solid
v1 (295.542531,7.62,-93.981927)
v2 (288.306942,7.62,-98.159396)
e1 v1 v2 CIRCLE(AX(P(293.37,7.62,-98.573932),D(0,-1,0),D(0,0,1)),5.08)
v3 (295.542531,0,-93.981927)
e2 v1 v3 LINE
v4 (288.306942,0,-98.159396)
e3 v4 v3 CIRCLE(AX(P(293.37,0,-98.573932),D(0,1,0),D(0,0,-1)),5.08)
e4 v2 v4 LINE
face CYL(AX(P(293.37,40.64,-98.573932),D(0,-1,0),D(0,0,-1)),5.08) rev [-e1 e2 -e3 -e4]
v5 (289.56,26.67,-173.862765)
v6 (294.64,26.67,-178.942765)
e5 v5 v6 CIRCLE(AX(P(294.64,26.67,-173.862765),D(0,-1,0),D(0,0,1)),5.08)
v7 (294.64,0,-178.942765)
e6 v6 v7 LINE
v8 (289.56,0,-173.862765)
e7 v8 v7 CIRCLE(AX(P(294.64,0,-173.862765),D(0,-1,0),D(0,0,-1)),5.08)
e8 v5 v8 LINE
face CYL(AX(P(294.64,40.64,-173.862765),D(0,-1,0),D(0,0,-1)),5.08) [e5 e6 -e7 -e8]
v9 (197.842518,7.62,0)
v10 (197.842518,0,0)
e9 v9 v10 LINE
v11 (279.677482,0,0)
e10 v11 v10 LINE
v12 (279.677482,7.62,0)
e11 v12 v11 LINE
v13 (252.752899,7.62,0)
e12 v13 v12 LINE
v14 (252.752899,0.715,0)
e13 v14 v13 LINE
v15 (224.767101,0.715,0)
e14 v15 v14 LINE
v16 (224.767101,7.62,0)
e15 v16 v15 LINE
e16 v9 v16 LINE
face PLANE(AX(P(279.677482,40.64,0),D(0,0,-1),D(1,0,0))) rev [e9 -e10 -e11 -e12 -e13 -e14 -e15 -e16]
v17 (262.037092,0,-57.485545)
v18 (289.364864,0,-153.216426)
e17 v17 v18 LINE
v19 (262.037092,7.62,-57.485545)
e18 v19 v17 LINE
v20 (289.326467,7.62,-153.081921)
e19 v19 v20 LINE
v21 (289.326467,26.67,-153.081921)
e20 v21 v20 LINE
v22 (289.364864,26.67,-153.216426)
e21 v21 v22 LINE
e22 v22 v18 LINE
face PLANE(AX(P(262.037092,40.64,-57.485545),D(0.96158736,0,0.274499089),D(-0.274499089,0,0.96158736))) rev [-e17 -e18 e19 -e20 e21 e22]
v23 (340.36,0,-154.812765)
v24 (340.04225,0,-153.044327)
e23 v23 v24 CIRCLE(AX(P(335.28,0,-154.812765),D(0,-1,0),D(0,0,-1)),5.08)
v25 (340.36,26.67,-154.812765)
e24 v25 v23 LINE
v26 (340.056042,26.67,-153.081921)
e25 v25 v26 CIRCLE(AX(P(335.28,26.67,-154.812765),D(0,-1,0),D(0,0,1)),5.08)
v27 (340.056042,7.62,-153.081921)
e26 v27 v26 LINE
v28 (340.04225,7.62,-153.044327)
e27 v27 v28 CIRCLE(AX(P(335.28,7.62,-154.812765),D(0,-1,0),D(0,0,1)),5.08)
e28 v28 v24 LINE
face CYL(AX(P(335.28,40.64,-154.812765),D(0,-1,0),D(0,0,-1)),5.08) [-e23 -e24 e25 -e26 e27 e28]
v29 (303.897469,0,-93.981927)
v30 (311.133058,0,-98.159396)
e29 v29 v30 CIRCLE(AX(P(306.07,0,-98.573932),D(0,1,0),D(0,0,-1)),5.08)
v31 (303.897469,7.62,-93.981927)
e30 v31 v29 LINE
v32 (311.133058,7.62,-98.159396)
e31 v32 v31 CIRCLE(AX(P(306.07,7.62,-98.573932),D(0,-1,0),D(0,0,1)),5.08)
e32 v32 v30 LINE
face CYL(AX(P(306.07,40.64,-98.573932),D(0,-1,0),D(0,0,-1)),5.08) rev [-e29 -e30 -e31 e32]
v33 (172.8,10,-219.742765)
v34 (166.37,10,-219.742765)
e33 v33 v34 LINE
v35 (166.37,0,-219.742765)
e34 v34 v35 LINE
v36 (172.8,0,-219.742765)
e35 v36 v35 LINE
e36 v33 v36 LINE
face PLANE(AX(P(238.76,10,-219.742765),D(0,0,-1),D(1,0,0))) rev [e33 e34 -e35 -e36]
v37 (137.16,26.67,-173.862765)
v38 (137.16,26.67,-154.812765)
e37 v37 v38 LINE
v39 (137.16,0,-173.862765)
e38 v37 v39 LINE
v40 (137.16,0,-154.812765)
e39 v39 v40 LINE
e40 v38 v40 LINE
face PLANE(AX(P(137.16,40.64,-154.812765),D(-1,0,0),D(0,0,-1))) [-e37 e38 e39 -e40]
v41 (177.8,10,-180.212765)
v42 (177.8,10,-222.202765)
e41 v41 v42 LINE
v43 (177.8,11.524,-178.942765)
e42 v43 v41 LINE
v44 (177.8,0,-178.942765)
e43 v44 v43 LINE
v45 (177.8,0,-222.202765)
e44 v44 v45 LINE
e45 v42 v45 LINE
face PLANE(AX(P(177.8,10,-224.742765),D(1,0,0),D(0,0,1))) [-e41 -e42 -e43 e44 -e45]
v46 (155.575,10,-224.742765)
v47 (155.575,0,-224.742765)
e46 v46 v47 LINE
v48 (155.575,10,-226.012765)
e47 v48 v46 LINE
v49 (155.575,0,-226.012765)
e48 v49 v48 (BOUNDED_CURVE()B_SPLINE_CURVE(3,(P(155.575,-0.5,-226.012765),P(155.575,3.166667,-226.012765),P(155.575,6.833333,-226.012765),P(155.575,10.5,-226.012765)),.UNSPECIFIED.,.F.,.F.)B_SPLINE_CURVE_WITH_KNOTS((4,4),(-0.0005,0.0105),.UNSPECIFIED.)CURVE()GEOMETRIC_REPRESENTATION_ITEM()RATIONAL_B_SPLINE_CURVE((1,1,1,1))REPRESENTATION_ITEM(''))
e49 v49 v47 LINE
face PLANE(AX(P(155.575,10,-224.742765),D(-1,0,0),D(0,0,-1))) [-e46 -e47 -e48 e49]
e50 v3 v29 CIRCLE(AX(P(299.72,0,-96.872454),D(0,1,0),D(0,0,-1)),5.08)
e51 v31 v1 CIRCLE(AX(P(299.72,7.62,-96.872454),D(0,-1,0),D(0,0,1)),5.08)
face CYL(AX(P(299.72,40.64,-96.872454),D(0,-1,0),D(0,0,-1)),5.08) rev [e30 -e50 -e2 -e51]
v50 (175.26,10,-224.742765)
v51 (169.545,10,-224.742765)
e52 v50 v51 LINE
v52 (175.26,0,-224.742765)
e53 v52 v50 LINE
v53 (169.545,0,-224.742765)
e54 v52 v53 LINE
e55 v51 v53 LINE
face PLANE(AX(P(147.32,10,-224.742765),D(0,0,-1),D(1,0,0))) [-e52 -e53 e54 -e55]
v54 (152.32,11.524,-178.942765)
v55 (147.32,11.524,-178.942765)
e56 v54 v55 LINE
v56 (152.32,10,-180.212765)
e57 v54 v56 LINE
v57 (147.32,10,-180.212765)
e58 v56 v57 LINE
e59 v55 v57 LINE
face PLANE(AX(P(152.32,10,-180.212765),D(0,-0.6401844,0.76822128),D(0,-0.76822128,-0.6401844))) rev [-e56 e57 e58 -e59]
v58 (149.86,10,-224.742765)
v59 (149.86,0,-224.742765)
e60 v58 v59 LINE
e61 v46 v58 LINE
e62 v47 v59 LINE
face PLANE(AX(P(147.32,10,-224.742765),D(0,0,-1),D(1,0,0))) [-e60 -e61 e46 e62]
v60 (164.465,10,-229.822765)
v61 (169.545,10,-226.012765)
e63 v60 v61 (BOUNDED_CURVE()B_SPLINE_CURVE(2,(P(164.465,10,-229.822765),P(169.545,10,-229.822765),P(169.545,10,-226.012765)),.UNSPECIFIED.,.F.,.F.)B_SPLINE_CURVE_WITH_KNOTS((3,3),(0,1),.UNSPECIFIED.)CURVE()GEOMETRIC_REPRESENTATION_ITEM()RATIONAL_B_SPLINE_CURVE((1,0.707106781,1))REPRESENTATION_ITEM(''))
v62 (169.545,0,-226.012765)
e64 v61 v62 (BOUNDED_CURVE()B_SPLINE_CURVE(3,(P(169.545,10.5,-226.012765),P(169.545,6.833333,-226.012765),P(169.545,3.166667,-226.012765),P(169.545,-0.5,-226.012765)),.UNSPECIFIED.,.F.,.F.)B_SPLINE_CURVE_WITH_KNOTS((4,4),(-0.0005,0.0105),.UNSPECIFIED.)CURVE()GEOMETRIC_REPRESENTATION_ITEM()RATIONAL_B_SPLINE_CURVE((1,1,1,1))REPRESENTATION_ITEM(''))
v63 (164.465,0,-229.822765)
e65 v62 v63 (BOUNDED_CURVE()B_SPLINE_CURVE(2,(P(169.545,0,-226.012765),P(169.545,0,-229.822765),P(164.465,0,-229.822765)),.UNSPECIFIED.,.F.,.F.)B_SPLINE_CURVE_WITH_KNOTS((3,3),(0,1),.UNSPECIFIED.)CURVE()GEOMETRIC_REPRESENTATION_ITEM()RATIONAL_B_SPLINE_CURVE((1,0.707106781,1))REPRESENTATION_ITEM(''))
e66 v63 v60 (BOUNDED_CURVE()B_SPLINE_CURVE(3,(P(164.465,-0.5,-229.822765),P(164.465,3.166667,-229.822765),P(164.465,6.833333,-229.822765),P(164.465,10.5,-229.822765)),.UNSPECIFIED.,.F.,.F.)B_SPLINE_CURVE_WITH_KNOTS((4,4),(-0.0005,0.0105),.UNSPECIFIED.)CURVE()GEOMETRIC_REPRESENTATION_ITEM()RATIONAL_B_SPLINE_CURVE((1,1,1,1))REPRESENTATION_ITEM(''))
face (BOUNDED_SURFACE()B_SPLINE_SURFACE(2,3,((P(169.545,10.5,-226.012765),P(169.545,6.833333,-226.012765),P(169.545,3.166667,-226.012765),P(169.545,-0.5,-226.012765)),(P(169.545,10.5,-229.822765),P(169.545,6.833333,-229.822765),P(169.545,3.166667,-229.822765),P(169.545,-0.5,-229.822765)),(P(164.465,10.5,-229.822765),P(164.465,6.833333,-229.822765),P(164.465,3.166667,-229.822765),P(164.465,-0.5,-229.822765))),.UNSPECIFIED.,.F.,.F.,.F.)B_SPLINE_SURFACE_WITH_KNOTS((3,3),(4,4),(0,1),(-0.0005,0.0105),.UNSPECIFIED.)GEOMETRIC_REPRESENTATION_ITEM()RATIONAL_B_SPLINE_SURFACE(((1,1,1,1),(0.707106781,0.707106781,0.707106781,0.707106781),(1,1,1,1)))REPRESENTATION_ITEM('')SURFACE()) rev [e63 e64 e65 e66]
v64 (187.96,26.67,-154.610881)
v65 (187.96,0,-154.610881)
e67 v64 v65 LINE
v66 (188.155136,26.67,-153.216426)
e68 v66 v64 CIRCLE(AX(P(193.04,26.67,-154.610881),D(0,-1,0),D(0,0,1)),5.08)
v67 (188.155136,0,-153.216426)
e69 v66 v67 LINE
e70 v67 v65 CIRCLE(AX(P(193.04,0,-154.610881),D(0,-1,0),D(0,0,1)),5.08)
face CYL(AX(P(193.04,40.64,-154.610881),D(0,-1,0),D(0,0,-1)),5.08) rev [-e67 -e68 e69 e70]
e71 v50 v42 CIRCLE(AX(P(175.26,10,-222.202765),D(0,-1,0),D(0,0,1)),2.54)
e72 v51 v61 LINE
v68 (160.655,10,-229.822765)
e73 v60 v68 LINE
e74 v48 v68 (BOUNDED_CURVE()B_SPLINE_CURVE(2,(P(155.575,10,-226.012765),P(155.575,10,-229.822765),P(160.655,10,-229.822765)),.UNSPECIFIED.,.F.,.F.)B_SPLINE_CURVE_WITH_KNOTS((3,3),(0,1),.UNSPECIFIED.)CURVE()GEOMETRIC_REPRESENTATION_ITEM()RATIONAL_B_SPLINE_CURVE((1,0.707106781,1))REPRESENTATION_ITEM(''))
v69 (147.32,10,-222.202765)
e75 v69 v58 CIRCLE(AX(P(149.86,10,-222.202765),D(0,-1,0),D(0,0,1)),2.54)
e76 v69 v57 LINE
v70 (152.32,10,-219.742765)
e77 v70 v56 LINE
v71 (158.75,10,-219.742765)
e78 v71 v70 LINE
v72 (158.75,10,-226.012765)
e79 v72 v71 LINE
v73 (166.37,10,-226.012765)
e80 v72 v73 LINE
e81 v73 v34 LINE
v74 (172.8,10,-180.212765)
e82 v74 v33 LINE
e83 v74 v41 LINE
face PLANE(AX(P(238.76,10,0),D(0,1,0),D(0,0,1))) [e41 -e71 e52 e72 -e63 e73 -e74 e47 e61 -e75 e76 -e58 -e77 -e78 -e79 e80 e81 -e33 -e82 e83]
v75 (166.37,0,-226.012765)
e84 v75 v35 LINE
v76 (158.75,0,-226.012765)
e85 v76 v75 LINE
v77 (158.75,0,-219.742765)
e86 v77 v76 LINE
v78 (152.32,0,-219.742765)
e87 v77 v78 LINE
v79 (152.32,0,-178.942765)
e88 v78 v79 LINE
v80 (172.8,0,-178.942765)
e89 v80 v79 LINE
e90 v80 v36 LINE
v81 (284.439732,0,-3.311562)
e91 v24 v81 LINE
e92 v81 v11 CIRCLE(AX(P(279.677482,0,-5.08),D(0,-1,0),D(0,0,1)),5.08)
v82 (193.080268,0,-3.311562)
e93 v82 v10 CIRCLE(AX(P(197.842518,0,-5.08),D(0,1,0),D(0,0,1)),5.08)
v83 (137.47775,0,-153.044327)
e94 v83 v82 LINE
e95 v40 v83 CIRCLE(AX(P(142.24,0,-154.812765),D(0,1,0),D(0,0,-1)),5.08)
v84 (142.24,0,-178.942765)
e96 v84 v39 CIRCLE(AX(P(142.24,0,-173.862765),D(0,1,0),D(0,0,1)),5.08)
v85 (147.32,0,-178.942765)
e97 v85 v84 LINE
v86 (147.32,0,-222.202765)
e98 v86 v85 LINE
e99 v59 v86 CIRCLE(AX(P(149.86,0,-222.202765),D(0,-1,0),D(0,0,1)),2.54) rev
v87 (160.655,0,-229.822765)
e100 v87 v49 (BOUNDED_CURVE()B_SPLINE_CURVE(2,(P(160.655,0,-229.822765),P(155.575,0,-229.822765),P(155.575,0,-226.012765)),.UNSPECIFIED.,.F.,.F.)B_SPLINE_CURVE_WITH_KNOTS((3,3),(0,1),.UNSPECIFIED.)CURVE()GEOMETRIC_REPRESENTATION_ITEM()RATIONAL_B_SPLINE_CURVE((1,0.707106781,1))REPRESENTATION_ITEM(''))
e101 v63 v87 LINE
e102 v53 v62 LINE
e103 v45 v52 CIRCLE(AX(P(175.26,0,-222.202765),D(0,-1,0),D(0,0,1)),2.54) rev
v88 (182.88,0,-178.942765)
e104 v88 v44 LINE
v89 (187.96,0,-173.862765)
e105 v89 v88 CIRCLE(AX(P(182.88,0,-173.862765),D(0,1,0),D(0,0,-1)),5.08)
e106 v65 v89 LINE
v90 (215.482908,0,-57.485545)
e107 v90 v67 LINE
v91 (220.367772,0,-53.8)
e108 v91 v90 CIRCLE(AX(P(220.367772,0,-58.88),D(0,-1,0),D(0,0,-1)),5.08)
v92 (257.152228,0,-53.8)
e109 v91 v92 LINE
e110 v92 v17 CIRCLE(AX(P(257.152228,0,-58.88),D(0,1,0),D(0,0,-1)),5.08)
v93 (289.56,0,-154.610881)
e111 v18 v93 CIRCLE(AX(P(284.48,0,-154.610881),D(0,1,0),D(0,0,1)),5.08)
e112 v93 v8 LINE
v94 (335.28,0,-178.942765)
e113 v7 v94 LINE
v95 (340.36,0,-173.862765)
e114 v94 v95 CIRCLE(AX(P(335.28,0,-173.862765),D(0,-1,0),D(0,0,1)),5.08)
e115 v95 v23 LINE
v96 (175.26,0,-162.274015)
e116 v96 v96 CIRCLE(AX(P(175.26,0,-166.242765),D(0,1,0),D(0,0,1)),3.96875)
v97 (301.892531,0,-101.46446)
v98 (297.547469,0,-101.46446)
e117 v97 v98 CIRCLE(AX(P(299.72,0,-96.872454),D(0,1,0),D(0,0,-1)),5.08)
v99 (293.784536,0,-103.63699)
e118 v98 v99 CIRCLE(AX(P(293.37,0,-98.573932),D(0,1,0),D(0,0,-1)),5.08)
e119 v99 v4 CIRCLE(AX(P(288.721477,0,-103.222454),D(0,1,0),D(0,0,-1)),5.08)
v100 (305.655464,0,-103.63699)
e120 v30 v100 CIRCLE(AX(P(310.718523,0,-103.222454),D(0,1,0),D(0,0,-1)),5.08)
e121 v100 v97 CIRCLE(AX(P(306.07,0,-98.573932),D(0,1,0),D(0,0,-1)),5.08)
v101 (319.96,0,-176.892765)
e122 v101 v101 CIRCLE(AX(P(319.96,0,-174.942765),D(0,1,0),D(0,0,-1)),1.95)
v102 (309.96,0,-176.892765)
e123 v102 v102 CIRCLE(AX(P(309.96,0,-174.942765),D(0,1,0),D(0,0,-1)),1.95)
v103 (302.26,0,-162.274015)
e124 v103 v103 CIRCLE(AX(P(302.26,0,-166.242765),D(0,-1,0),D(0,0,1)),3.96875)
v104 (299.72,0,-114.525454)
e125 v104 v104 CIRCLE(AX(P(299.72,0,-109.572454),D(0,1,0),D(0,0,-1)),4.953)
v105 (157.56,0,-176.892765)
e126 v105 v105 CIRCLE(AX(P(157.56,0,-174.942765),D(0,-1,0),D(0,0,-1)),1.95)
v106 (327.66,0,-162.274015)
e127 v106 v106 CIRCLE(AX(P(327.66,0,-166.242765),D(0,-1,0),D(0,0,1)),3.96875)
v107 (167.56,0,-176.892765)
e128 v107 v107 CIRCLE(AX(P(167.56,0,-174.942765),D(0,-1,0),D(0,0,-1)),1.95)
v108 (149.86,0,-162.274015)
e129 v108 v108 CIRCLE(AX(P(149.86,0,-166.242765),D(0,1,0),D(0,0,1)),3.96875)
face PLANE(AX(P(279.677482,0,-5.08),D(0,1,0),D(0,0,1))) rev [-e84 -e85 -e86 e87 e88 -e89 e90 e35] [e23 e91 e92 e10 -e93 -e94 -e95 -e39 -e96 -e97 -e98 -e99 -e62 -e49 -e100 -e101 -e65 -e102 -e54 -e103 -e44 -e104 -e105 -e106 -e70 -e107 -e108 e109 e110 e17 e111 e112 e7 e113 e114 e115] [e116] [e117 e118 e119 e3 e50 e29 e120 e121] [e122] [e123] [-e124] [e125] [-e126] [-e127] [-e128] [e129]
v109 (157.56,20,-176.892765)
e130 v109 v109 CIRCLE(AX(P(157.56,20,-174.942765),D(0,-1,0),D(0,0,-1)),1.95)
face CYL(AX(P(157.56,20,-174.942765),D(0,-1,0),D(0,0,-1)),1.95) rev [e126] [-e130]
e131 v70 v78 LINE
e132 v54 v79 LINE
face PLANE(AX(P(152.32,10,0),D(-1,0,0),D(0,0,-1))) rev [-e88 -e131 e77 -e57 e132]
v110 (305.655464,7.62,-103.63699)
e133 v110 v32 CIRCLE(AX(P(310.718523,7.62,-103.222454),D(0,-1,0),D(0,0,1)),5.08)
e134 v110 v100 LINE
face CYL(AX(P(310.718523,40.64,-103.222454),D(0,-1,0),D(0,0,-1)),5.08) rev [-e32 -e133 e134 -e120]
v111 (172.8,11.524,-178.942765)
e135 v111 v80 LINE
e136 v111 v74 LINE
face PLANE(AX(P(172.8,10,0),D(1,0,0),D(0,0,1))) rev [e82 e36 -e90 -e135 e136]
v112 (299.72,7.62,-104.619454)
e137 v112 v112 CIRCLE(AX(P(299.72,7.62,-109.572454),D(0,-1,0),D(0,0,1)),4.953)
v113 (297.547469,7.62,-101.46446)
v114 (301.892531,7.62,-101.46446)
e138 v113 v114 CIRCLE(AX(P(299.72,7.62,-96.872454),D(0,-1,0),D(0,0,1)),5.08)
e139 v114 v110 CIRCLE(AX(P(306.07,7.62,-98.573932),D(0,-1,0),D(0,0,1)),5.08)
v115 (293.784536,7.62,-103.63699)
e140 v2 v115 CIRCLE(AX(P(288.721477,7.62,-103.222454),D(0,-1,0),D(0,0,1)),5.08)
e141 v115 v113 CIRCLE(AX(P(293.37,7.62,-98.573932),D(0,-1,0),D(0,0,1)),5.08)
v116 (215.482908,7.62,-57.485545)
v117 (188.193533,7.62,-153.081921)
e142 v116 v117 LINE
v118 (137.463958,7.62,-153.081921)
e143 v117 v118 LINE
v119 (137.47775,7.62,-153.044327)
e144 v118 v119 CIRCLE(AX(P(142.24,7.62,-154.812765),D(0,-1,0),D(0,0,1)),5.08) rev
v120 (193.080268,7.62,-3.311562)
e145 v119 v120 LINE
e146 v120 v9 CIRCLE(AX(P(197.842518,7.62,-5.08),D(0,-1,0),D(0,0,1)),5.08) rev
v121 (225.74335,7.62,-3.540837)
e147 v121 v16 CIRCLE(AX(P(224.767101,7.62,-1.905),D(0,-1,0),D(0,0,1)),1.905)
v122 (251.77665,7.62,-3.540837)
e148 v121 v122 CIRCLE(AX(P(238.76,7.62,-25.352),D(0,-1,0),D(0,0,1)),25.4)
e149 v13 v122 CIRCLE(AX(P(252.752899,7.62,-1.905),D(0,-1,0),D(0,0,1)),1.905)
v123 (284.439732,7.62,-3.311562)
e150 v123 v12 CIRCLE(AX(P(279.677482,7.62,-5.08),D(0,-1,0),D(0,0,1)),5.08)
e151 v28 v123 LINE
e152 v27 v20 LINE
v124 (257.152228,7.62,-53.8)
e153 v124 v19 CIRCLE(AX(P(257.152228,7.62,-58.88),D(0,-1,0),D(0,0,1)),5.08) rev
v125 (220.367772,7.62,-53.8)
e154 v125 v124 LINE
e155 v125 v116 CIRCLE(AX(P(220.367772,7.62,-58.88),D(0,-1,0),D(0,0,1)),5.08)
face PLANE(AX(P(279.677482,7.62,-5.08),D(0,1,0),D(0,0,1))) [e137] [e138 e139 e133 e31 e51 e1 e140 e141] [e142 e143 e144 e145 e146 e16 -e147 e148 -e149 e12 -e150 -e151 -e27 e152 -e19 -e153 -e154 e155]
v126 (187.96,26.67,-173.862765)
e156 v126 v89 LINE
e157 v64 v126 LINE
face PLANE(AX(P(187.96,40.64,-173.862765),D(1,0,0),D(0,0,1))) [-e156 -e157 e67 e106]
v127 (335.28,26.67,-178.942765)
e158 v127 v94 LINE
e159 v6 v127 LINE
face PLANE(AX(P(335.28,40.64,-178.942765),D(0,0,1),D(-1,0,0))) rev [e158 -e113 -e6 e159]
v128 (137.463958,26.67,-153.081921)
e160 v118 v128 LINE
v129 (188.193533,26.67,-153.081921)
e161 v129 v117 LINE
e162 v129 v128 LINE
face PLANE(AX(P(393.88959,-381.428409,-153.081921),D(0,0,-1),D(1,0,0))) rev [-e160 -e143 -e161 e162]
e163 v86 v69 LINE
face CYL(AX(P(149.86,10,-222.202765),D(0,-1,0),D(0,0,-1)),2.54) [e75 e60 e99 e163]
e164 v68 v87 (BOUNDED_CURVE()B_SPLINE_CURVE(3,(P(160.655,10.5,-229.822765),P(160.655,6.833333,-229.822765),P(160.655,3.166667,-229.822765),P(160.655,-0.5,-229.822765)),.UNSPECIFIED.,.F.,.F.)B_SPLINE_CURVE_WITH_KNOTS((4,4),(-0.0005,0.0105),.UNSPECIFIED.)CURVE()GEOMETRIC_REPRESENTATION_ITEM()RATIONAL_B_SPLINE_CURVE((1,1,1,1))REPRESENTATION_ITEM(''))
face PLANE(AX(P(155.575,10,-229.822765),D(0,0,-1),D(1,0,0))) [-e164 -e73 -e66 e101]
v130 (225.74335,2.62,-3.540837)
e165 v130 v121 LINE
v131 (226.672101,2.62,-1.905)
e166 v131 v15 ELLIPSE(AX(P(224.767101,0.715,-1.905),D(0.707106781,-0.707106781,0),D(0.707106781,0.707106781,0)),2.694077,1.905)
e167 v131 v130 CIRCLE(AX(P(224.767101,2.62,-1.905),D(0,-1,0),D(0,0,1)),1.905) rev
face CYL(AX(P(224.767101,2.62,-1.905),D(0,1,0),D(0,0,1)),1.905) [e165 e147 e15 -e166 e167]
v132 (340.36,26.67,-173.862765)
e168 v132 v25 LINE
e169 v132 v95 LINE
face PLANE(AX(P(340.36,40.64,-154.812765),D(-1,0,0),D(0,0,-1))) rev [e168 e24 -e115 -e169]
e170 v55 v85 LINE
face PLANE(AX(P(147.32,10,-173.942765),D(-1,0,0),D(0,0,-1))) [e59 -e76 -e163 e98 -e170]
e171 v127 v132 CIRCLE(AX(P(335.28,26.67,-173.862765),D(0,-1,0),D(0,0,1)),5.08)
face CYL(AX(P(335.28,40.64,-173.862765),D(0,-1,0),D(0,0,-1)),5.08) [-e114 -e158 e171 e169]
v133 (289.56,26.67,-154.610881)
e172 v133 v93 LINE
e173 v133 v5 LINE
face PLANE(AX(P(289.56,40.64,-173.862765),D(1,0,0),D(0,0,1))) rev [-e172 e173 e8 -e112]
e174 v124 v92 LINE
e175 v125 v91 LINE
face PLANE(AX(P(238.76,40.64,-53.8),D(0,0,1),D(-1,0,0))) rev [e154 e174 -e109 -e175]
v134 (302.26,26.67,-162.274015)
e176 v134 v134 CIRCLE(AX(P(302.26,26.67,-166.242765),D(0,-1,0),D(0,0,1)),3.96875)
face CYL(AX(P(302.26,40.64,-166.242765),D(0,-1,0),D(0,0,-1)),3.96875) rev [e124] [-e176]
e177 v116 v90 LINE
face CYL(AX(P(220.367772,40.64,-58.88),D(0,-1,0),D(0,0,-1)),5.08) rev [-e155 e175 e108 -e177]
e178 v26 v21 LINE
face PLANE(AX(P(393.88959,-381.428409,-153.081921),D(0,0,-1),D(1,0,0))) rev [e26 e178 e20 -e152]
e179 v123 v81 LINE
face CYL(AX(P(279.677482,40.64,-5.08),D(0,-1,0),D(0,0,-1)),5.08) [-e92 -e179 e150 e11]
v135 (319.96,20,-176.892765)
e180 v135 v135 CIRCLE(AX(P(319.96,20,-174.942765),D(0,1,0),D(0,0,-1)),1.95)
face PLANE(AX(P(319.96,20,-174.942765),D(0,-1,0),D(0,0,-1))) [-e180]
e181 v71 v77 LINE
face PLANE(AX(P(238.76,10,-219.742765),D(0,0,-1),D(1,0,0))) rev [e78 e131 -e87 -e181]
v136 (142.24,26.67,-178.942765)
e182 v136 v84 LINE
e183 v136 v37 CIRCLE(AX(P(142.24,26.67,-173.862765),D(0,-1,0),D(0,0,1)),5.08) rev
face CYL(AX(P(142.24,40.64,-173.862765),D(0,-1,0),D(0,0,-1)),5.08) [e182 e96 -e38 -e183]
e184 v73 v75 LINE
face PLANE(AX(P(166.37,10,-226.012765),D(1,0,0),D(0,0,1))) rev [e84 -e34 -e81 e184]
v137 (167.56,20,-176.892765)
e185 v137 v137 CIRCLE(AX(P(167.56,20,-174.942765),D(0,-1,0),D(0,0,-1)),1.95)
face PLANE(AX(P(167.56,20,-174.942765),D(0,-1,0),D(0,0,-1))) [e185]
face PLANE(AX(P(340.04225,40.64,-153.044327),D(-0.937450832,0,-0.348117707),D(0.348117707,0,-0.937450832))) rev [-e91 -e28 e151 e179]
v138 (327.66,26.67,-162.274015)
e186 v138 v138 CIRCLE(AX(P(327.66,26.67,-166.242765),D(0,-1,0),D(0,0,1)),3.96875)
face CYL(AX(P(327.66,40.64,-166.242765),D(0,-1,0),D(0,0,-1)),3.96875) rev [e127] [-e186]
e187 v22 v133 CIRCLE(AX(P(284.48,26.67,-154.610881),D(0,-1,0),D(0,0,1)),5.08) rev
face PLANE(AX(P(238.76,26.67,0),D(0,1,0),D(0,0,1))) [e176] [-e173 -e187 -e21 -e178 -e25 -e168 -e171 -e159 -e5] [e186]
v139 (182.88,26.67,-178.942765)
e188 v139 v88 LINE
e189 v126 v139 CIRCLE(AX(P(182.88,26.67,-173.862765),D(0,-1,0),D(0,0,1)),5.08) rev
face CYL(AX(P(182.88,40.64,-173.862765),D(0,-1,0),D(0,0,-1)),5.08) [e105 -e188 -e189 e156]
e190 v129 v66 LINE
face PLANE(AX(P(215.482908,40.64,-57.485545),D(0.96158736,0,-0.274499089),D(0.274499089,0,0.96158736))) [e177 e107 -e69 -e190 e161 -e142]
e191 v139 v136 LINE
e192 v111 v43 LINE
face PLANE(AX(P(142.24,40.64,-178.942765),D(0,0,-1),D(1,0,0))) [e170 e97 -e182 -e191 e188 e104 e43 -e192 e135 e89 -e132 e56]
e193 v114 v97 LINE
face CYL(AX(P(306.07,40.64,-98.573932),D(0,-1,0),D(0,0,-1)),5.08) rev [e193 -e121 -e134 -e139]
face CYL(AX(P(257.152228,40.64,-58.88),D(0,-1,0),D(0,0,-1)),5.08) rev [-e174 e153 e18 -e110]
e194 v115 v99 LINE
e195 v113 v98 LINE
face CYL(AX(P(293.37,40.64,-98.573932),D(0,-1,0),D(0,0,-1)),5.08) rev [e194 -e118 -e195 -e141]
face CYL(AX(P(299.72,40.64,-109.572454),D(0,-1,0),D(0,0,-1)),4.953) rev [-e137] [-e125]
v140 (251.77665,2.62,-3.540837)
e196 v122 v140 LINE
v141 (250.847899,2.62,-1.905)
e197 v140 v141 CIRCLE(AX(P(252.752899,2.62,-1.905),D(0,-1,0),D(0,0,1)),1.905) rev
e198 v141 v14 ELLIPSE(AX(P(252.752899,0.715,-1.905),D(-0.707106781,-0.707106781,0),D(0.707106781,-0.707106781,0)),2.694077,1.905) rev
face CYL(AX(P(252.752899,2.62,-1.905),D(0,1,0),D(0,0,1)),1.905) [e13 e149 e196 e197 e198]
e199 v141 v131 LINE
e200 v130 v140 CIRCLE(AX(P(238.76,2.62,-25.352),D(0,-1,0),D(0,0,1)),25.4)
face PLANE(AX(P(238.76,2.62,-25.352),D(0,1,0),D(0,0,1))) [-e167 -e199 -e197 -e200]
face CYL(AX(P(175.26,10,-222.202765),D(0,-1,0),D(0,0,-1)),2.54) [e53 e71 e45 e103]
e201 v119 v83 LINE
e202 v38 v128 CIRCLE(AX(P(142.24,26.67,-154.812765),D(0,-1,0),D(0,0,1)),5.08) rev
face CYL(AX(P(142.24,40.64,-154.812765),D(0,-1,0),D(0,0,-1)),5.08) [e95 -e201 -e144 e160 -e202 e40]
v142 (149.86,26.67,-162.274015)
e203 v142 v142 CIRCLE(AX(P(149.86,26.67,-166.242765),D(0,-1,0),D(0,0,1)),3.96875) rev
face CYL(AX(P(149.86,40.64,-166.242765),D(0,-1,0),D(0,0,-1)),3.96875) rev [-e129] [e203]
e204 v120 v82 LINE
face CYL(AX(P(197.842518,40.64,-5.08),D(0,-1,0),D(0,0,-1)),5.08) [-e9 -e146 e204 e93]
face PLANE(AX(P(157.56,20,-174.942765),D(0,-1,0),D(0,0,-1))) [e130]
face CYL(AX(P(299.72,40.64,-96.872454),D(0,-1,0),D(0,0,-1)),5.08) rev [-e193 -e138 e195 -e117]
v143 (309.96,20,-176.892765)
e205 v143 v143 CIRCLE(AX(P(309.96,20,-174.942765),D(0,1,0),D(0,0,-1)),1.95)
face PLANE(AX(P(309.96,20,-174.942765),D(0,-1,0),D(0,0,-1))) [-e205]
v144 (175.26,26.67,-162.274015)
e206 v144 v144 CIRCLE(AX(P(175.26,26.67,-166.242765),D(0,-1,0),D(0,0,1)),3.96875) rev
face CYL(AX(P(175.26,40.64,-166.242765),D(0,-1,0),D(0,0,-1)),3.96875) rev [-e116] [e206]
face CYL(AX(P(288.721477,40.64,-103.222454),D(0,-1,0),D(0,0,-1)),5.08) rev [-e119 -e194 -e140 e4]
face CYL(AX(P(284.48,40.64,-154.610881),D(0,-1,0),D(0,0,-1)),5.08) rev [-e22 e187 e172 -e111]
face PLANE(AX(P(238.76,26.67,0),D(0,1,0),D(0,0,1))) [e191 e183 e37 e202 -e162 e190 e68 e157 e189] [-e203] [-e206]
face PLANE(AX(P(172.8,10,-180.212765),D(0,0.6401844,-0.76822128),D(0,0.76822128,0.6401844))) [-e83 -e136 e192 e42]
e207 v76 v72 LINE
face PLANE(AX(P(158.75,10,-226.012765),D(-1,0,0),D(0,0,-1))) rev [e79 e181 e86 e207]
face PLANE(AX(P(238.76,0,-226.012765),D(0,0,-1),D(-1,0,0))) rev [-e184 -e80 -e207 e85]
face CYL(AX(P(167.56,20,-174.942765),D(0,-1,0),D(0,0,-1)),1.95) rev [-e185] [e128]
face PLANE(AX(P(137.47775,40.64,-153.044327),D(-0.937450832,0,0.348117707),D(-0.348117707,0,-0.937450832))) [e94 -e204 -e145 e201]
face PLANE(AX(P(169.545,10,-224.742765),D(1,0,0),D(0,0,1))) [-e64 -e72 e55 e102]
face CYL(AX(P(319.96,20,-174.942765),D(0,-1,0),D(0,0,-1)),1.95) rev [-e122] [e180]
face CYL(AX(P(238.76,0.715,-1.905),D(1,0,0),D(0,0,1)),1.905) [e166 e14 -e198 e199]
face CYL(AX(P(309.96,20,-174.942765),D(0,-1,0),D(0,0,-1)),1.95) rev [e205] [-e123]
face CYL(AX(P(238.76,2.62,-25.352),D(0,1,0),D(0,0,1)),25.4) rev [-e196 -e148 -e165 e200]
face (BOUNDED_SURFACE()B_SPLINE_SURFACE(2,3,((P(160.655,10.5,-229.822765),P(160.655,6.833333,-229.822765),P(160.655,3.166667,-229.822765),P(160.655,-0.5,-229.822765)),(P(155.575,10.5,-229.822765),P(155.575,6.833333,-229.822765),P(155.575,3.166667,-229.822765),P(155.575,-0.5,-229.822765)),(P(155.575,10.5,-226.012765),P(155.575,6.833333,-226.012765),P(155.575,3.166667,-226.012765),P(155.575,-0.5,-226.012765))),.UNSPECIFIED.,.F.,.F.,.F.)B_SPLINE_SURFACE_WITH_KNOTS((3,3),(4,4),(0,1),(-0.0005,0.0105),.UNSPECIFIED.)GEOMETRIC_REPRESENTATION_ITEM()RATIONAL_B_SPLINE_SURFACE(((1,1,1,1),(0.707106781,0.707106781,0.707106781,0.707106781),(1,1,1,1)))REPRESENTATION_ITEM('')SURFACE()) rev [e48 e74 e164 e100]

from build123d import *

# Parameters (mm, degrees)
SKETCH1_R            = 3.96875
BOSS_EXTRUDE2_DEPTH  = 40.64
SKETCH7_W            = 321.437634852
SKETCH7_H            = 153.081921076
CUT_EXTRUDE3_DEPTH   = 33.02
EXTRUDE_THIN1_DEPTH  = 10
SKETCH14_R           = 1.950000064
CUT_EXTRUDE6_DEPTH   = 20
BOSS_EXTRUDE4_DEPTH  = 5
MIRROR5_COPY_1_DEPTH = 5
FILLET3_R            = 2.54
SKETCH20_W           = 13.97
SKETCH20_H           = 5.08
BOSS_EXTRUDE5_DEPTH  = 10
FILLET7_SIZE         = 3.81
FILLET7_SIZE_2       = 5.08
FILLET6_SIZE         = 3.81
FILLET6_SIZE_2       = 5.08
CUT_EXTRUDE10_START  = -5
SKETCH19_W           = 7.62
SKETCH19_H           = 10.16
CUT_EXTRUDE10_DEPTH  = 6.27
MIRROR6_OUTLINE_W    = 7.62
MIRROR6_OUTLINE_H    = 5
MIRROR6_DEPTH        = 10
MIRROR6_2_DEPTH      = 10
SKETCH21_W           = 77.087164644
SKETCH21_H           = 69.073945867
CUT_EXTRUDE11_DEPTH  = 210.74909516
SKETCH23_R           = 5.08
CUT_EXTRUDE12_DEPTH  = 255.54404949
SKETCH22_R           = 4.953
CUT_EXTRUDE13_DEPTH  = 255.54404949
CUT_EXTRUDE14_START  = 19.05
SKETCH24_W           = 240.575030827
SKETCH24_H           = 80.300707095
CUT_EXTRUDE14_DEPTH  = 235.389112867
SKETCH25_R           = 25.4
CUT_EXTRUDE15_DEPTH  = 5
FILLET10_R           = 1.905


# Read off the part's stored shape, not the designer's step: Mirror6
with BuildPart() as part:
    # Sketch1 → Boss-Extrude2 (new body)
    with BuildSketch(Plane(origin=(0, 0, 0), x_dir=(1, 0, 0), z_dir=(0, 1, 0))):
        with BuildLine():
            Line((-96.52, 178.942765331), (-55.88, 178.942765331))
            ThreePointArc((-55.88, 178.942765331), (-52.287897552, 177.454867779), (-50.8, 173.862765331))
            Line((-50.8, 173.862765331), (-50.8, 154.610881096))
            ThreePointArc((-50.8, 154.610881096), (-50.750979429, 153.906859803), (-50.604863787, 153.216425724))
            Line((-50.604863787, 153.216425724), (-23.277092285, 57.485544628))
            ThreePointArc((-23.277092285, 57.485544628), (-21.451849938, 54.824742099), (-18.392228498, 53.8))
            Line((-18.392228498, 53.8), (0, 53.8))
            Line((0, 53.8), (0, 0))
            Line((0, 0), (-40.91748188, 0))
            ThreePointArc((-40.91748188, 0), (-43.817717665, 0.909264766), (-45.679732106, 3.31156205))
            Line((-45.679732106, 3.31156205), (-101.282250226, 153.044327381))
            ThreePointArc((-101.282250226, 153.044327381), (-101.519931557, 153.914386555), (-101.6, 154.812765331))
            Line((-101.6, 154.812765331), (-101.6, 173.862765331))
            ThreePointArc((-101.6, 173.862765331), (-100.112102448, 177.454867779), (-96.52, 178.942765331))
        make_face()
        with Locations(Location((-88.9, 166.242765331, 0), (0, 0, 270))):
            Circle(SKETCH1_R, mode=Mode.SUBTRACT)
        with Locations(Location((-63.5, 166.242765331, 0), (0, 0, 270))):
            Circle(SKETCH1_R, mode=Mode.SUBTRACT)
    boss_extrude2 = extrude(amount=BOSS_EXTRUDE2_DEPTH)

    # Mirror1: Boss-Extrude2 across plane
    add(boss_extrude2.mirror(Plane(origin=(0, 40.64, -53.8), x_dir=(0, 0, 1), z_dir=(-1, 0, 0))))

    # Sketch7 → Cut-Extrude3 (cut)
    with BuildSketch(Plane(origin=(0, 40.64, 0), x_dir=(1, 0, 0), z_dir=(0, 1, 0))):
        with Locations((5.589227859, 76.540960538)):
            Rectangle(SKETCH7_W, SKETCH7_H)
    extrude(amount=-CUT_EXTRUDE3_DEPTH, mode=Mode.SUBTRACT)

    # Sketch9 → Extrude-Thin1 (add)
    with BuildSketch(Plane(origin=(0, 0, 0), x_dir=(1, 0, 0), z_dir=(0, 1, 0))):
        Polygon((-91.44, 173.942765331), (-91.44, 224.742765331), (-60.96, 224.742765331), (-60.96, 173.942765331), (-65.96, 173.942765331), (-65.96, 219.742765331), (-86.44, 219.742765331), (-86.44, 173.942765331), align=None)
    extrude_thin1 = extrude(amount=EXTRUDE_THIN1_DEPTH)

    # Sketch14 → Cut-Extrude6 (cut)
    with BuildSketch(Plane.XZ):
        with Locations(Location((-81.2, -174.942765331, 0), (0, 0, 270))):
            Circle(SKETCH14_R)
        with Locations(Location((-71.2, -174.942765331, 0), (0, 0, 270))):
            Circle(SKETCH14_R)
    cut_extrude6 = extrude(amount=-CUT_EXTRUDE6_DEPTH, mode=Mode.SUBTRACT)

    # Sketch18 → Boss-Extrude4 (add)
    with BuildSketch(Plane(origin=(-60.96, 10, -178.942765331), x_dir=(0, 0, 1), z_dir=(-1, 0, 0))):
        Polygon((-1.27, 0), (0, 1.524), (0, 0), align=None)
    boss_extrude4 = extrude(amount=BOSS_EXTRUDE4_DEPTH)

    # Mirror3: Boss-Extrude4 across plane
    add(boss_extrude4.mirror(Plane(origin=(-76.2, 0, 0), x_dir=(0, 0, 1), z_dir=(1, 0, 0))))

    # Mirror5: Extrude-Thin1, Cut-Extrude6, Boss-Extrude4 across plane
    add(extrude_thin1.mirror(Plane(origin=(0, 0, 0), x_dir=(0, 0, 1), z_dir=(1, 0, 0))))
    add(cut_extrude6.mirror(Plane(origin=(0, 0, 0), x_dir=(0, 0, 1), z_dir=(1, 0, 0))), mode=Mode.SUBTRACT)
    add(boss_extrude4.mirror(Plane(origin=(0, 0, 0), x_dir=(0, 0, 1), z_dir=(1, 0, 0))))

    # Mirror5 copy 1 sketch → Mirror5 copy 1 (add)
    with BuildSketch(Plane(origin=(91.44, 10, -178.942765331), x_dir=(0, 0, 1), z_dir=(-1, 0, 0))):
        Polygon((-1.27, 0), (0, 1.524), (0, 0), align=None)
    extrude(amount=MIRROR5_COPY_1_DEPTH)

    # Fillet3
    fillet3_edges = [part.edges().sort_by_distance(p)[0] for p in [
        (-91.44, 5, -224.742765331),
        (-60.96, 5, -224.742765331),
        (91.44, 5, -224.742765331),
        (60.96, 5, -224.742765331),
    ]]
    fillet(fillet3_edges, radius=FILLET3_R)

    # Sketch20 → Boss-Extrude5 (add)
    with BuildSketch(Plane(origin=(0, 0, 0), x_dir=(1, 0, 0), z_dir=(0, 1, 0))):
        with Locations((-76.2, 227.282765331)):
            Rectangle(SKETCH20_W, SKETCH20_H)
    extrude(amount=BOSS_EXTRUDE5_DEPTH)

    # Fillet7
    # an asymmetric fillet: 5.08, 3.81 mm, written as the material it takes off along each edge
    with BuildSketch(Plane(origin=(-83.185, -12.7, -229.822765331), x_dir=(0, 0, 1), z_dir=(0, 1, 0))) as fillet7_piece_1:
        with BuildLine():
            Bezier((FILLET7_SIZE, 0), (0, 0), (0, FILLET7_SIZE_2), weights=[1, 0.707106781, 1])
            Line((0, FILLET7_SIZE_2), (0, 0))
            Line((0, 0), (FILLET7_SIZE, 0))
        make_face()
    extrude(amount=35.4, mode=Mode.SUBTRACT)

    # Fillet6
    # an asymmetric fillet: 5.08, 3.81 mm, written as the material it takes off along each edge
    with BuildSketch(Plane(origin=(-69.215, -12.7, -229.822765331), x_dir=(0, 0, 1), z_dir=(0, 1, 0))) as fillet6_piece_1:
        with BuildLine():
            Bezier((FILLET6_SIZE, 0), (0, 0), (0, -FILLET6_SIZE_2), weights=[1, 0.707106781, 1])
            Line((0, -FILLET6_SIZE_2), (0, 0))
            Line((0, 0), (FILLET6_SIZE, 0))
        make_face()
    extrude(amount=35.4, mode=Mode.SUBTRACT)

    # Sketch19 → Cut-Extrude10 (cut)
    with BuildSketch(Plane(origin=(0, 0, -224.742765331), x_dir=(-1, 0, 0), z_dir=(0, 0, -1)).offset(CUT_EXTRUDE10_START)):
        with Locations((76.2, 4.92)):
            Rectangle(SKETCH19_W, SKETCH19_H)
    extrude(amount=CUT_EXTRUDE10_DEPTH, mode=Mode.SUBTRACT)

    # Mirror6 outline → Mirror6 (cut)
    with BuildSketch(Plane(origin=(0, 0, 0), x_dir=(1, 0, 0), z_dir=(0, 1, 0))):
        with Locations((76.2, 222.242765331)):
            Rectangle(MIRROR6_OUTLINE_W, MIRROR6_OUTLINE_H)
    extrude(amount=MIRROR6_DEPTH, mode=Mode.SUBTRACT)

    # Mirror6 2 outline → Mirror6 2 (add)
    with BuildSketch(Plane(origin=(0, 0, 0), x_dir=(1, 0, 0), z_dir=(0, 1, 0))):
        with BuildLine():
            add(Edge.make_bspline(
                [(78.105, 229.822765331), (83.185, 229.822765331), (83.185, 226.012765331)],
                knots=[0, 0, 0, 1, 1, 1], degree=2, weights=[1, 0.707106781, 1]))
            Line((78.105, 229.822765331), (74.295, 229.822765331))
            add(Edge.make_bspline(
                [(69.215, 226.012765331), (69.215, 229.822765331), (74.295, 229.822765331)],
                knots=[0, 0, 0, 1, 1, 1], degree=2, weights=[1, 0.707106781, 1]))
            Line((69.215, 226.012765331), (69.215, 224.742765331))
            Line((69.215, 224.742765331), (72.39, 224.742765331))
            Line((72.39, 224.742765331), (72.39, 226.012765331))
            Line((72.39, 226.012765331), (80.01, 226.012765331))
            Line((80.01, 226.012765331), (80.01, 224.742765331))
            Line((80.01, 224.742765331), (83.185, 224.742765331))
            Line((83.185, 224.742765331), (83.185, 226.012765331))
        make_face()
    extrude(amount=MIRROR6_2_DEPTH)

    # Sketch21 → Cut-Extrude11 (cut, through all)
    with BuildSketch(Plane(origin=(0, 0, -178.942765331), x_dir=(-1, 0, 0), z_dir=(0, 0, -1))):
        with Locations((78.752430528, 22.788762469)):
            Rectangle(SKETCH21_W, SKETCH21_H)
    extrude(amount=CUT_EXTRUDE11_DEPTH, mode=Mode.SUBTRACT)

    # Sketch23 → Cut-Extrude12 (cut, through all)
    with BuildSketch(Plane.XZ):
        with Locations((-67.31, -98.573931837)):
            Circle(SKETCH23_R)
        with Locations((-71.958522628, -103.222454465)):
            Circle(SKETCH23_R)
        with Locations((-60.96, -96.872454465)):
            Circle(SKETCH23_R)
        with Locations((-54.61, -98.573931837)):
            Circle(SKETCH23_R)
        with Locations((-49.961477372, -103.222454465)):
            Circle(SKETCH23_R)
    extrude(amount=-CUT_EXTRUDE12_DEPTH, mode=Mode.SUBTRACT)

    # Sketch22 → Cut-Extrude13 (cut, through all)
    with BuildSketch(Plane.XZ):
        with Locations(Location((-60.96, -109.572454465, 0), (0, 0, 270))):
            Circle(SKETCH22_R)
    extrude(amount=-CUT_EXTRUDE13_DEPTH, mode=Mode.SUBTRACT)

    # Sketch24 → Cut-Extrude14 (cut, through all)
    with BuildSketch(Plane(origin=(0, 7.62, 0), x_dir=(1, 0, 0), z_dir=(0, 1, 0)).offset(CUT_EXTRUDE14_START)):
        with Locations((-12.016343346, 155.193868331)):
            Rectangle(SKETCH24_W, SKETCH24_H)
    extrude(amount=CUT_EXTRUDE14_DEPTH, mode=Mode.SUBTRACT)

    # Sketch25 → Cut-Extrude15 (cut)
    with BuildSketch(Plane(origin=(0, 7.62, 0), x_dir=(1, 0, 0), z_dir=(0, 1, 0))):
        with Locations((0, 25.352)):
            Circle(SKETCH25_R)
    extrude(amount=-CUT_EXTRUDE15_DEPTH, mode=Mode.SUBTRACT)

    # Fillet10
    fillet10_edges = [part.edges().sort_by_distance(p)[0] for p in [
        (0, 2.62, 0),
        (-1.560799795, 5.12, 0),
        (1.560799795, 5.12, 0),
    ]]
    fillet(fillet10_edges, radius=FILLET10_R)


with BuildPart() as body_2:
    # Mirror16: mirrored copy
    add(part.part.mirror(Plane(origin=(119.38, 0, 0), x_dir=(0, 0, 1), z_dir=(1, 0, 0))))


solid = body_2.part
